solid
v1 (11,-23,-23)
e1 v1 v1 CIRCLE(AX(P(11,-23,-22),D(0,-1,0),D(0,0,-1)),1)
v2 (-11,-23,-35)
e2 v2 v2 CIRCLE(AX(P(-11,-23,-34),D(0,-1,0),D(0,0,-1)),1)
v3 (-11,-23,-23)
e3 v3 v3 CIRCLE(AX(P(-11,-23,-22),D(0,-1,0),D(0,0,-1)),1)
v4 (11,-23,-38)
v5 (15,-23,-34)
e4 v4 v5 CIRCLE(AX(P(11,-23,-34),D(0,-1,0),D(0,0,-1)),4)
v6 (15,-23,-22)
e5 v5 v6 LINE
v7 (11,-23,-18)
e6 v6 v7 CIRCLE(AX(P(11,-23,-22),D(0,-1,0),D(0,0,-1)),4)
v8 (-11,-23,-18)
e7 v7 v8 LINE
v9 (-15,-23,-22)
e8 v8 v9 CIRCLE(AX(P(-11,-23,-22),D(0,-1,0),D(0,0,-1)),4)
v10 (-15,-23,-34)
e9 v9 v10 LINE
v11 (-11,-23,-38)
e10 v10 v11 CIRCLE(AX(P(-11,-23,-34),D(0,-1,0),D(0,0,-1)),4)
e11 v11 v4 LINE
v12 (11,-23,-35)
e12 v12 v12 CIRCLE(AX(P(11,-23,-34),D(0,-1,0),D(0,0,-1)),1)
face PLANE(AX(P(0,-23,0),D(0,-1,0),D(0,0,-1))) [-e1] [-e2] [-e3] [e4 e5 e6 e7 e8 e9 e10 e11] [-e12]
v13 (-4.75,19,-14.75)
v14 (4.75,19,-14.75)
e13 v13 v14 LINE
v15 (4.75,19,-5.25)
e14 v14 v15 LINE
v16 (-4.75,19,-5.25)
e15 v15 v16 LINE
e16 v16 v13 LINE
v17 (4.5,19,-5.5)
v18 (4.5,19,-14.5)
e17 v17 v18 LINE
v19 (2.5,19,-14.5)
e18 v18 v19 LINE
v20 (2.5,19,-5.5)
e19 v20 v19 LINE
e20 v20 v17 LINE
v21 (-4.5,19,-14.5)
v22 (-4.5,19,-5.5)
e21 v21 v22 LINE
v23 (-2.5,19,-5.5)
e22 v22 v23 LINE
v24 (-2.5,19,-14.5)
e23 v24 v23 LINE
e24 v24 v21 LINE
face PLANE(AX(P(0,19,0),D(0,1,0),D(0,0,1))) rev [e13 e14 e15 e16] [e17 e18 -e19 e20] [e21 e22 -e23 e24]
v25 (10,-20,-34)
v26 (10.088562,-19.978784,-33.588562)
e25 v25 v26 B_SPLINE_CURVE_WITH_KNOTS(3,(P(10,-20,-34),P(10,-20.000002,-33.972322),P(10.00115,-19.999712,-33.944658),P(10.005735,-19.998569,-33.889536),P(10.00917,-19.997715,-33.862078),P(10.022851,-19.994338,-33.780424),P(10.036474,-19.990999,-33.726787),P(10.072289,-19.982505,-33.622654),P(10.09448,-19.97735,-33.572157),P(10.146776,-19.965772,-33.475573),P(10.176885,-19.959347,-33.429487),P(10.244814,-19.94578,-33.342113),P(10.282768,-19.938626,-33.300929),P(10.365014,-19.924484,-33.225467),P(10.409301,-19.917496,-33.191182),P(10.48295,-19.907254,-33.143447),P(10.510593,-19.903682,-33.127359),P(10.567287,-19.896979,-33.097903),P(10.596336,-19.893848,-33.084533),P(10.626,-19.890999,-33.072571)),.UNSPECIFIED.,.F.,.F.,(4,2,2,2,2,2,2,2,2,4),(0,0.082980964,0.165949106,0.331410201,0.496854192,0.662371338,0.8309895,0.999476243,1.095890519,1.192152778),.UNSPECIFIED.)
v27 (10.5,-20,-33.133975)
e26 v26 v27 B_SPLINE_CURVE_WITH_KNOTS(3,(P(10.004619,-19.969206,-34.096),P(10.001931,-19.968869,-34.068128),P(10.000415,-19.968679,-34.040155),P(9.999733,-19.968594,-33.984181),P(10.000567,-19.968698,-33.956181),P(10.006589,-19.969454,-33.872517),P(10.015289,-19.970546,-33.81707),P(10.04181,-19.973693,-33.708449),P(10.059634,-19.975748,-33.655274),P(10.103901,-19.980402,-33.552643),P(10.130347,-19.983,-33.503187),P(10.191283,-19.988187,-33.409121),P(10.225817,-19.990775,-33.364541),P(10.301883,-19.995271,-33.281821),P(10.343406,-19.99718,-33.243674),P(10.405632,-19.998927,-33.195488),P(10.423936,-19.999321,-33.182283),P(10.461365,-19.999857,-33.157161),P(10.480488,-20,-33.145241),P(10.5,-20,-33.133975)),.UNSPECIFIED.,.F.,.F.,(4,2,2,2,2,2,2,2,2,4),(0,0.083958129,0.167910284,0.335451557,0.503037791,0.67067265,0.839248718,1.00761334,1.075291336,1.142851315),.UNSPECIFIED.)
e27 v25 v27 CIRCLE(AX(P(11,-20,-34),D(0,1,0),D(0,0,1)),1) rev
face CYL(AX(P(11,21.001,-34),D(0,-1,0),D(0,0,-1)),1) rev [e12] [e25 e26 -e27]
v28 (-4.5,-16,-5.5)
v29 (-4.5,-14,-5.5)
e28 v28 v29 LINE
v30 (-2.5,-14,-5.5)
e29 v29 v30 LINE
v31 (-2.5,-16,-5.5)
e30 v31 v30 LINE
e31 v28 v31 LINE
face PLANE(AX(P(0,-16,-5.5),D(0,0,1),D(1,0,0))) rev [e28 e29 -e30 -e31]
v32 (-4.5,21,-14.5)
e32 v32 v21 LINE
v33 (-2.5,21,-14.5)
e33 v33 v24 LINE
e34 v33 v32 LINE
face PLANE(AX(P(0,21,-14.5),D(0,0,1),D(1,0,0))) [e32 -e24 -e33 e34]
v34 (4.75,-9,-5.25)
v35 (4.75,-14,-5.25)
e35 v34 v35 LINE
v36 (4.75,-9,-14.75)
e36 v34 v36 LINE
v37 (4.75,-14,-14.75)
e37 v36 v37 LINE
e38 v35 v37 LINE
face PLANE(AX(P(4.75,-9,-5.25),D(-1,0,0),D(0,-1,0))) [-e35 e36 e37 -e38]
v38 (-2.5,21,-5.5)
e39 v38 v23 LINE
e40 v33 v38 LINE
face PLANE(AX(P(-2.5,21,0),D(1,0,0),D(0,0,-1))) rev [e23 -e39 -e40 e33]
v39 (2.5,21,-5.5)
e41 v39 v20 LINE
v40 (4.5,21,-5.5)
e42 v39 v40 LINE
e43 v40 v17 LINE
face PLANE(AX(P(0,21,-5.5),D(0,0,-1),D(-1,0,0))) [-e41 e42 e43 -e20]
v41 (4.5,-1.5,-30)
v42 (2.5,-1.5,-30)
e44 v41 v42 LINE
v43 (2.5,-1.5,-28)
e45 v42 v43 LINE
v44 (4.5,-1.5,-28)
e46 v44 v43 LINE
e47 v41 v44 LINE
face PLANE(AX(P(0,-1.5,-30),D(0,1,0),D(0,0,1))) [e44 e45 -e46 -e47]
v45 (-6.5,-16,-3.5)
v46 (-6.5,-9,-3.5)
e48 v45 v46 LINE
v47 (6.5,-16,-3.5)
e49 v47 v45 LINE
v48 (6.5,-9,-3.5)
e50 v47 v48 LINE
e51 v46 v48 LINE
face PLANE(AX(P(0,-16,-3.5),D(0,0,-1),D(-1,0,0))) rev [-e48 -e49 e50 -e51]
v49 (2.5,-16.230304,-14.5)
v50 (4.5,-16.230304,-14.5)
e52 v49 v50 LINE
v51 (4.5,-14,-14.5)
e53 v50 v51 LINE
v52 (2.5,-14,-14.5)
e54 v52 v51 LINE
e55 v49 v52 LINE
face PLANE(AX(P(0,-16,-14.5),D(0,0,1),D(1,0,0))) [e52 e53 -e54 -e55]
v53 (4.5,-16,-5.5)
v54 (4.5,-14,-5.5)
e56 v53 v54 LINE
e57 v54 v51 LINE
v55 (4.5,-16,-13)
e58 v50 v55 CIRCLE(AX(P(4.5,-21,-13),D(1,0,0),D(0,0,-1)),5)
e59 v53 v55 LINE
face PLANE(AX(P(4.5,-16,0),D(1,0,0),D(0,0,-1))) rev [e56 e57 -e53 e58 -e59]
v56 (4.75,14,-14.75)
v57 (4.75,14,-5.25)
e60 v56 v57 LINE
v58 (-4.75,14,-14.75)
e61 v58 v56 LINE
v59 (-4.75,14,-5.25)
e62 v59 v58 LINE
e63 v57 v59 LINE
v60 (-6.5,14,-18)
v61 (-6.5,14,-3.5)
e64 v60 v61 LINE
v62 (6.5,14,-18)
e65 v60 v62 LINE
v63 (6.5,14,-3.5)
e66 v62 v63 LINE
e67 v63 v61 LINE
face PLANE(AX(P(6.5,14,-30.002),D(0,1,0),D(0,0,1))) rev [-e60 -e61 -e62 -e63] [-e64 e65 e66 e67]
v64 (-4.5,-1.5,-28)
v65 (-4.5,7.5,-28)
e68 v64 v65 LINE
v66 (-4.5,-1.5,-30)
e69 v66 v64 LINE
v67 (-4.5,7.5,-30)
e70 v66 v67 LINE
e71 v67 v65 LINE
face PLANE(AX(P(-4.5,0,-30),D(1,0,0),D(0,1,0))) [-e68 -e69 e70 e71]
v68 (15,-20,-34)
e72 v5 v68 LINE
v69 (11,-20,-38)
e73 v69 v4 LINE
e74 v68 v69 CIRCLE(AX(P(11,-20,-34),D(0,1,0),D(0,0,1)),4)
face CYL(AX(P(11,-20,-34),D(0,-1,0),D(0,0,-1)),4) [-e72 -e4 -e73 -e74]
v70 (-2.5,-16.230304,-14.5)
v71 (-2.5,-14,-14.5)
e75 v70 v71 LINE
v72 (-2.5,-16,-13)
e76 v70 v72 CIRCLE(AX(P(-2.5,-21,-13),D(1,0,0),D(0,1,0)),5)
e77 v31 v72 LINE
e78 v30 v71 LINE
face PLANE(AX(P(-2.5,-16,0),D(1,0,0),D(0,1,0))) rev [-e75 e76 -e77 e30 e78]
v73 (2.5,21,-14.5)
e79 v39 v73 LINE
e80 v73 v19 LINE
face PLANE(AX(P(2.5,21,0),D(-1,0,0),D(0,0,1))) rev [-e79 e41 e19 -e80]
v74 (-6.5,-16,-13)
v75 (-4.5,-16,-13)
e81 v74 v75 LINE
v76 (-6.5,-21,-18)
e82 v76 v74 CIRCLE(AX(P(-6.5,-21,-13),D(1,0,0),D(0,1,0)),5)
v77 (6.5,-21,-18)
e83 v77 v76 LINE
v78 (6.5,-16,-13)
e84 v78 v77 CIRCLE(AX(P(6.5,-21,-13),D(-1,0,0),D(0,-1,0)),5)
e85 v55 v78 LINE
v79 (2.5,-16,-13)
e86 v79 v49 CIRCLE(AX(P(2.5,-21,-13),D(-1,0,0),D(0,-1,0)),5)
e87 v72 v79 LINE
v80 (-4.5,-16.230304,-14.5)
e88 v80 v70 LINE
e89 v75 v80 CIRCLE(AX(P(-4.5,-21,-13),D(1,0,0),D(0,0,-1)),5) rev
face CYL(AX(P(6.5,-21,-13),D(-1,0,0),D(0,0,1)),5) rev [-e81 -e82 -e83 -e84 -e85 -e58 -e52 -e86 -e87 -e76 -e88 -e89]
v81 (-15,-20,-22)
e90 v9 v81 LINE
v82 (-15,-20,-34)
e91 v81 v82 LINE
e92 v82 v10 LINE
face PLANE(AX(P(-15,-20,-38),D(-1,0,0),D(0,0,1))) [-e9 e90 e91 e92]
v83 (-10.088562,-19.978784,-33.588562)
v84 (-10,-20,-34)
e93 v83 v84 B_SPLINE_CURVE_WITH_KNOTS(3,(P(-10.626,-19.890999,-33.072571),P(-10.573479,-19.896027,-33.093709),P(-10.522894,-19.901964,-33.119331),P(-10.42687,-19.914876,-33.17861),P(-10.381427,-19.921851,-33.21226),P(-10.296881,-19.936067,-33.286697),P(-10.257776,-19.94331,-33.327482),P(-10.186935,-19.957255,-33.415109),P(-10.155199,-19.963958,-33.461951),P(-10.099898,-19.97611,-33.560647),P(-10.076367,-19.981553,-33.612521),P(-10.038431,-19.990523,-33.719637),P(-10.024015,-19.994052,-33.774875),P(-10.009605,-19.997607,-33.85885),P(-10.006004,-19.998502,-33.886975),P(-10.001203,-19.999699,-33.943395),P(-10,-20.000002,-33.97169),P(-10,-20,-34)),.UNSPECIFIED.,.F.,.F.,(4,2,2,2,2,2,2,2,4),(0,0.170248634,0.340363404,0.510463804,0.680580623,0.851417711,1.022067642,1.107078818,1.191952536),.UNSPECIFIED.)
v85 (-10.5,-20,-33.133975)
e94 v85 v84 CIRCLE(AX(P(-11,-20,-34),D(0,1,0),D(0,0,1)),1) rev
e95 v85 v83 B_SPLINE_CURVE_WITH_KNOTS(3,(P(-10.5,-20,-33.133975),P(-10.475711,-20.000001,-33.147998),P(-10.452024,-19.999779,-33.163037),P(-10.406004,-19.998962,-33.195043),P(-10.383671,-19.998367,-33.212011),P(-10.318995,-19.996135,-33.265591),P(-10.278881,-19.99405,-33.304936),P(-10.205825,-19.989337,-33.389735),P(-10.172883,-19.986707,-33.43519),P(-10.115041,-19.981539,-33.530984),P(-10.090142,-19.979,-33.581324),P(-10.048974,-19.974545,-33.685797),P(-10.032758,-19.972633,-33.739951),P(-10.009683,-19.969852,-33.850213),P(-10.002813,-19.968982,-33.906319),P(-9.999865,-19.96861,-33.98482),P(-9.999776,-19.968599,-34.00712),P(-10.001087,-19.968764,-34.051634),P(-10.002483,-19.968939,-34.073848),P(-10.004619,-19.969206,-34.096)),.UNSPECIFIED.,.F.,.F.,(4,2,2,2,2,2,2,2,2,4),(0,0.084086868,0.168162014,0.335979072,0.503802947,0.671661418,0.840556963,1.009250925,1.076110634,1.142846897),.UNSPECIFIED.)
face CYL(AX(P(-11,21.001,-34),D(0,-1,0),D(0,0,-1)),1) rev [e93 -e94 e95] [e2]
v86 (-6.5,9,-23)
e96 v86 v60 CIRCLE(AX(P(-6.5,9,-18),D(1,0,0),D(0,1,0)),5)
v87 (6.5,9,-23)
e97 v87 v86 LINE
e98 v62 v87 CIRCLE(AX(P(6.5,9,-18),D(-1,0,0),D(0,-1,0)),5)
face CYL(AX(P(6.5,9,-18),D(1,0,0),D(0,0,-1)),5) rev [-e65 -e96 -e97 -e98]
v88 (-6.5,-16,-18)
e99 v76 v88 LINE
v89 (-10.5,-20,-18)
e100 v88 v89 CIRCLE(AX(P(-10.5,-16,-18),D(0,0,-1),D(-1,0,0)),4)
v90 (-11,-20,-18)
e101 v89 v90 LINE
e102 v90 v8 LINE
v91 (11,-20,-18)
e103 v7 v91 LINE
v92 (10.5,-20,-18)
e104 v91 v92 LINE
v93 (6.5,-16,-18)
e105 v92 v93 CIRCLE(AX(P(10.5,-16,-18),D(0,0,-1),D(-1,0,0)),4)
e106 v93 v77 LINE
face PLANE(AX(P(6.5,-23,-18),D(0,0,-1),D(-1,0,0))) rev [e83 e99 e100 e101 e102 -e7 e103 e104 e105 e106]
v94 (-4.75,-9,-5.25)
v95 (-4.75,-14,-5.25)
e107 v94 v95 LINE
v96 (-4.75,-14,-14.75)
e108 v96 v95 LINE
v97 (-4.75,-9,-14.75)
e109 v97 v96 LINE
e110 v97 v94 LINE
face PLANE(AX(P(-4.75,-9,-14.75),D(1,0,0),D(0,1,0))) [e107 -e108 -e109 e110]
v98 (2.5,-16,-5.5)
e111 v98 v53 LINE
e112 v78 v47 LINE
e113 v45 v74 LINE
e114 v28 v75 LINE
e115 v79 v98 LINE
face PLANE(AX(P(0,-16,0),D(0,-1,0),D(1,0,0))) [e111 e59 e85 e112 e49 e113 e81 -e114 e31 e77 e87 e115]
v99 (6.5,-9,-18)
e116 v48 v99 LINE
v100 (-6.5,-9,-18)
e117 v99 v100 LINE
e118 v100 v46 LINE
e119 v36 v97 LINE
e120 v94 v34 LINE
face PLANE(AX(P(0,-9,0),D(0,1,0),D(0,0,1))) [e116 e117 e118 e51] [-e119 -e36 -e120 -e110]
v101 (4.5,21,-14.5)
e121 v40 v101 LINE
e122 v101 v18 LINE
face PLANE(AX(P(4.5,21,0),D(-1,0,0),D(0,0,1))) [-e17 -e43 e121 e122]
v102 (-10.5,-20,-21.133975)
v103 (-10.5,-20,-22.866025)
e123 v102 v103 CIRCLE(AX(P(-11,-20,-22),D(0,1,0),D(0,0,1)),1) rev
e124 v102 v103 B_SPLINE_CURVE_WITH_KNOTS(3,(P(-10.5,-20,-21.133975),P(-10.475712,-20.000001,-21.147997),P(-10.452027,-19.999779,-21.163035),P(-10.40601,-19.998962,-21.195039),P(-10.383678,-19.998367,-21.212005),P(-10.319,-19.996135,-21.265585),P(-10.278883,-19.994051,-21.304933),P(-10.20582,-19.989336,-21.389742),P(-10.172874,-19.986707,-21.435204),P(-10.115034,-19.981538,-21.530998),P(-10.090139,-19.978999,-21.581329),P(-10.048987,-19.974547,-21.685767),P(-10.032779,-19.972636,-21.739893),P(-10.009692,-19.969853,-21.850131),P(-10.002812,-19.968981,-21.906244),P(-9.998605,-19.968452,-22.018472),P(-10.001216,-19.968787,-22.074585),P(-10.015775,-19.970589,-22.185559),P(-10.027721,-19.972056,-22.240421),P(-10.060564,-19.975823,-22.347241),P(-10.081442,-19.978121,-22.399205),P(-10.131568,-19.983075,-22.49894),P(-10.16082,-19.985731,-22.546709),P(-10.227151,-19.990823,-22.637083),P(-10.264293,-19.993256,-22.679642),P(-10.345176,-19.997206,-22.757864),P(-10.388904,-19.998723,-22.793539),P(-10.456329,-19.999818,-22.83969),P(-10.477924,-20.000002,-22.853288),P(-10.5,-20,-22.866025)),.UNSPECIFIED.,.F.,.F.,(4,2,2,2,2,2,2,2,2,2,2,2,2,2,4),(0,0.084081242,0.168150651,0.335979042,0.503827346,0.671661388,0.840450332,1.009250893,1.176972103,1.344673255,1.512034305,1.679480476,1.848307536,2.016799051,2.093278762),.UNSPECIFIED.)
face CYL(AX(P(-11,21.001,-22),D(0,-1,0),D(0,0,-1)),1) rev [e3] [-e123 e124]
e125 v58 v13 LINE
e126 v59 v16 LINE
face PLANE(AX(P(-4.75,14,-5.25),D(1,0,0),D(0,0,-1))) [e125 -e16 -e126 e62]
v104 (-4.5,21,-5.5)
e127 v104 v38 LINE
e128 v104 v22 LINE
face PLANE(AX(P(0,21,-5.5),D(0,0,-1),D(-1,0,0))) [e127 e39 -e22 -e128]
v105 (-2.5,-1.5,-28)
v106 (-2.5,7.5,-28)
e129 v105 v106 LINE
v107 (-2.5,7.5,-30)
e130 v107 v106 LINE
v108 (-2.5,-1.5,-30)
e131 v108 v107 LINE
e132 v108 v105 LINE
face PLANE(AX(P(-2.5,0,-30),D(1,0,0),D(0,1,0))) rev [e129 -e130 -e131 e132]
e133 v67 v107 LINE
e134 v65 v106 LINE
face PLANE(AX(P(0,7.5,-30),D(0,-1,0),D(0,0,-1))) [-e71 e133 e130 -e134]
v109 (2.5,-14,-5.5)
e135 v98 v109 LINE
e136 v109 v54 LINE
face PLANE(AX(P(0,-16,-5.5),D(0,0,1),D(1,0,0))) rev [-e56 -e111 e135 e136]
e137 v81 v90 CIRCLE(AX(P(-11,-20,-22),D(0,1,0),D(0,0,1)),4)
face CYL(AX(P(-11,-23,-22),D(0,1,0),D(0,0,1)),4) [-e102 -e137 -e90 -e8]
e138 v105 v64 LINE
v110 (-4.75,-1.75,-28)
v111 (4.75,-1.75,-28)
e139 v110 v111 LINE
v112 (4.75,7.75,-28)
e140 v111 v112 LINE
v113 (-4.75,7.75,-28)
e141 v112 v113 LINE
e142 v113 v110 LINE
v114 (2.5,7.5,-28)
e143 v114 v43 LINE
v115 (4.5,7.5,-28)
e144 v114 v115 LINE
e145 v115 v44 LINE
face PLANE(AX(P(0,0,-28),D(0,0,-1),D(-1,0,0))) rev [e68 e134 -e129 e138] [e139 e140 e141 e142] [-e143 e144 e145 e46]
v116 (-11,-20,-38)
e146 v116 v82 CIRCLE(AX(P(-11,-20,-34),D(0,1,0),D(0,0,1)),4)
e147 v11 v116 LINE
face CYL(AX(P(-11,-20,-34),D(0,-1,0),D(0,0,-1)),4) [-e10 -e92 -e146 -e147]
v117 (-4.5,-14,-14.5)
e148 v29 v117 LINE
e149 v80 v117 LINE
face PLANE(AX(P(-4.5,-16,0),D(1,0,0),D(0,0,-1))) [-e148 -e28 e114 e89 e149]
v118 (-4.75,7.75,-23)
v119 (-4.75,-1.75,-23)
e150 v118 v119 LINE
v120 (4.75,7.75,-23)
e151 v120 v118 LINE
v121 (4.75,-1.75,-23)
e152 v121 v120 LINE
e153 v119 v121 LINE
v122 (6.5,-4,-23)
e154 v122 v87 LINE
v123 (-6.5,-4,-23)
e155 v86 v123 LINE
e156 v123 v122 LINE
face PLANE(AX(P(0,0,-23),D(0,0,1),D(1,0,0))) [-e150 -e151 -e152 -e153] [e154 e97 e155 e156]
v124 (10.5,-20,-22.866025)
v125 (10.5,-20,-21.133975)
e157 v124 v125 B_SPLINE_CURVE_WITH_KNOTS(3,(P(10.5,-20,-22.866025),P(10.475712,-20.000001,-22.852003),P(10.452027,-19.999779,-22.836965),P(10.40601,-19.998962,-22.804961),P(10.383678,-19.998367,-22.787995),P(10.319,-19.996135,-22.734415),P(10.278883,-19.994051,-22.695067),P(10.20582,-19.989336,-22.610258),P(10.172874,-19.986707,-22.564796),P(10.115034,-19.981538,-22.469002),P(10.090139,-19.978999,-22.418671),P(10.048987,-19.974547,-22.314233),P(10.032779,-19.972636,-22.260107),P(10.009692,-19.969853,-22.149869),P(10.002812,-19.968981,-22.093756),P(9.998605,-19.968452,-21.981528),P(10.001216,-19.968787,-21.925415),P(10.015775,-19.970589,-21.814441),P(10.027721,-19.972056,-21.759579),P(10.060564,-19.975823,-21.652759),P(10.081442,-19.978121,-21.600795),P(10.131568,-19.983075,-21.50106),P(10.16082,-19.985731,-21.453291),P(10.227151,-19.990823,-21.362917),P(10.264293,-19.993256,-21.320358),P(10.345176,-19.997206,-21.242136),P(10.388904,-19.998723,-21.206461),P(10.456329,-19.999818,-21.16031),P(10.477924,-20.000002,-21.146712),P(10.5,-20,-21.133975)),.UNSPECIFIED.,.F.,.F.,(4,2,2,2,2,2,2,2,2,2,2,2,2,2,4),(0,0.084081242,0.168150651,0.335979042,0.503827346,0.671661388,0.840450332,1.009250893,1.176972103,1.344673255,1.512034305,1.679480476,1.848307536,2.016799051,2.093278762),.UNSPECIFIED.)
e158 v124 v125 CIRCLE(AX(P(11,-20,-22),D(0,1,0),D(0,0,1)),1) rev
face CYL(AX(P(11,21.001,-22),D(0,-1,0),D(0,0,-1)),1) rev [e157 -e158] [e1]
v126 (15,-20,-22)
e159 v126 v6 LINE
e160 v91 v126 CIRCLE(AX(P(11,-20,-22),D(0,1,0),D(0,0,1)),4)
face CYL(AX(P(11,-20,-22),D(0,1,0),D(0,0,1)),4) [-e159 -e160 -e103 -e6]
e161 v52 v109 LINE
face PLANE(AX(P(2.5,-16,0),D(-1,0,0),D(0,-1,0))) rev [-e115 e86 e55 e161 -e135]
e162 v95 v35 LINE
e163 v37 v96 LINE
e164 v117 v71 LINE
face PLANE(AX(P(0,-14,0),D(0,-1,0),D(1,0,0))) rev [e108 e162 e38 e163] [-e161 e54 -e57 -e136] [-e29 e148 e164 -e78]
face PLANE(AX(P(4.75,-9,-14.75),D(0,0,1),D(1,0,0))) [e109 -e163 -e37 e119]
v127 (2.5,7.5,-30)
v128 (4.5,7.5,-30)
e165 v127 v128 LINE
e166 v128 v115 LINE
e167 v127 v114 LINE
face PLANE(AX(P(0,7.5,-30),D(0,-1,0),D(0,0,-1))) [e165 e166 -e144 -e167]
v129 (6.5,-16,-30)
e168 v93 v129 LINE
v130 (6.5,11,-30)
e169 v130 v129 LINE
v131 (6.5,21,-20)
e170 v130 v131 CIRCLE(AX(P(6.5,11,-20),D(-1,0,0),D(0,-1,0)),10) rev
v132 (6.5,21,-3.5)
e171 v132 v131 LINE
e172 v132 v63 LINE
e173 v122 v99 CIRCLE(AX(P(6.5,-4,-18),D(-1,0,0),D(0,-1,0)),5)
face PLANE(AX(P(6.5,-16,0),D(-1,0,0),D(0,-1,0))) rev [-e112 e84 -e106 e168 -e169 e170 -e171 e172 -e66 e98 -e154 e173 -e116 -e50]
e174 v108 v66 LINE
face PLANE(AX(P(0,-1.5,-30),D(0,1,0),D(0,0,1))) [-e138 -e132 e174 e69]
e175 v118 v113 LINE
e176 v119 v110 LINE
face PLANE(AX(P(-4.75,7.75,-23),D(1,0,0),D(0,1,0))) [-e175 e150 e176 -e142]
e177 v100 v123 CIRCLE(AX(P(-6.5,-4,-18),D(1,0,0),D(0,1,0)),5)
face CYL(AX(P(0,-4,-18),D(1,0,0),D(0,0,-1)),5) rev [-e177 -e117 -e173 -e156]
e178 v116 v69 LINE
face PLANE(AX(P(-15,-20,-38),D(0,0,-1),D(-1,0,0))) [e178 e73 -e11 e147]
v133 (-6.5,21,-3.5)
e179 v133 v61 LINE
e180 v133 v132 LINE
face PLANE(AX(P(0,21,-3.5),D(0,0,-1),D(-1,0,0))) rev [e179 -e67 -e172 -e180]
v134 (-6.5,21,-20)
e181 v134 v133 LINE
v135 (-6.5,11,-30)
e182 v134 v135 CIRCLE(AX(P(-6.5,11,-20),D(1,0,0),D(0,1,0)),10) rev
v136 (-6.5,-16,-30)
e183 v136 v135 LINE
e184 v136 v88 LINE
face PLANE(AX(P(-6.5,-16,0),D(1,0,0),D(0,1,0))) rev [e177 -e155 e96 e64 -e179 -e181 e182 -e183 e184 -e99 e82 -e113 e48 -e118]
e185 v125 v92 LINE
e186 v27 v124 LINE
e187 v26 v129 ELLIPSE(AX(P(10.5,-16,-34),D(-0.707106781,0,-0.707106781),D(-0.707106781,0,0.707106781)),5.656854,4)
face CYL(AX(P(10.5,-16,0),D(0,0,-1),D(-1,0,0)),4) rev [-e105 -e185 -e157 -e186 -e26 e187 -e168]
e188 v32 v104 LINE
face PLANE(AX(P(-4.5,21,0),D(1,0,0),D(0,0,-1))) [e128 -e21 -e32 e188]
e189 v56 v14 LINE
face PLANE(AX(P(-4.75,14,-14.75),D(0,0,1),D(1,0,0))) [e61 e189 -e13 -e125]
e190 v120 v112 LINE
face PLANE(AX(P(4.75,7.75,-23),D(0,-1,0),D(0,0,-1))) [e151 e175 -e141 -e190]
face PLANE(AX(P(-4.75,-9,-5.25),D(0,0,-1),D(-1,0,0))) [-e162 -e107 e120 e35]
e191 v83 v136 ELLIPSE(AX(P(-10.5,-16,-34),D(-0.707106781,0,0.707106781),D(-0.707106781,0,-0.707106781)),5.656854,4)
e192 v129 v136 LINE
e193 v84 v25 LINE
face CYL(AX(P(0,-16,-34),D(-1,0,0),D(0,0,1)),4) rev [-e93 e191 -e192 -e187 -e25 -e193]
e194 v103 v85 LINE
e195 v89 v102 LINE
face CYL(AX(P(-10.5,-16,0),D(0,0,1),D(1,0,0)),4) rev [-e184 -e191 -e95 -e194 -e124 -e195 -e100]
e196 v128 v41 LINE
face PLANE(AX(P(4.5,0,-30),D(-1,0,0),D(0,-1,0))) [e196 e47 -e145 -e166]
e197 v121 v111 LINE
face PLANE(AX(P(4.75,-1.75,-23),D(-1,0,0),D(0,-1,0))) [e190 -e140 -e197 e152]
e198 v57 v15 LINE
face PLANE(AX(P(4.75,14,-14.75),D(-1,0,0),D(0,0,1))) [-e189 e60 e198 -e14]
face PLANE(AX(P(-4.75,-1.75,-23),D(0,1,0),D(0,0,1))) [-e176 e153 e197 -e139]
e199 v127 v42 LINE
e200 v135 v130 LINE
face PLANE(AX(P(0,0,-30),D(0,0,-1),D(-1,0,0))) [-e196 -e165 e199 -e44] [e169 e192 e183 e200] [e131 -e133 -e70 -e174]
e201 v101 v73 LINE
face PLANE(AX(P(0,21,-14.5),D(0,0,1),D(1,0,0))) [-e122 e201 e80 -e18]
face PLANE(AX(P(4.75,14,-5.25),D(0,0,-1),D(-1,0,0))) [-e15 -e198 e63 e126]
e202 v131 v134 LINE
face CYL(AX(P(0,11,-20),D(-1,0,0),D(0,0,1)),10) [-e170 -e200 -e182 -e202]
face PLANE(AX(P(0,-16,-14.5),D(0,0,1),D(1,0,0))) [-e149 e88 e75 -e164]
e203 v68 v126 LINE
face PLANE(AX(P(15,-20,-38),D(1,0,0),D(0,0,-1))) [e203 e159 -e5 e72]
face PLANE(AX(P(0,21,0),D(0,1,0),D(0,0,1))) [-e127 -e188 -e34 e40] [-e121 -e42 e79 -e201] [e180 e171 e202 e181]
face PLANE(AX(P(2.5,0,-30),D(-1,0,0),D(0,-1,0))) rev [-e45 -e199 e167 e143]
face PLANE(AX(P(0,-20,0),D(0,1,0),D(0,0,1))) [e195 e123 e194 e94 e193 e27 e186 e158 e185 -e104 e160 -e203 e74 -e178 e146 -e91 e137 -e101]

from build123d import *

# Parameters (mm, degrees)
SKETCH1_W            = 13
SKETCH1_H            = 13
SKETCH1_W_2          = 5
SKETCH1_H_2          = 9
BOSS_EXTRUDE1_DEPTH  = 2
SKETCH2_W            = 13
SKETCH2_H            = 13
SKETCH2_W_2          = 9.5
SKETCH2_H_2          = 9.5
BOSS_EXTRUDE2_DEPTH  = 5
SKETCH3_W            = 13
SKETCH3_H            = 13
SKETCH3_W_2          = 5
SKETCH3_H_2          = 9
BOSS_EXTRUDE3_DEPTH  = 2
SKETCH4_W            = 13
SKETCH4_H            = 13
SKETCH4_W_2          = 9.5
SKETCH4_H_2          = 9.5
BOSS_EXTRUDE4_DEPTH  = 5
SKETCH5_W            = 13
SKETCH5_H            = 13
SKETCH5_W_2          = 5
SKETCH5_H_2          = 9
BOSS_EXTRUDE5_DEPTH  = 2
SKETCH6_W            = 13
SKETCH6_H            = 13
SKETCH6_W_2          = 9.5
SKETCH6_H_2          = 9.5
BOSS_EXTRUDE6_DEPTH  = 5
SKETCH7_W            = 13
SKETCH7_H            = 7
BOSS_EXTRUDE7_DEPTH  = 12.5
SKETCH8_W            = 13
SKETCH8_H            = 7
BOSS_EXTRUDE8_DEPTH  = 11.5
BOSS_EXTRUDE9_REACH  = 27.797
SKETCH9_W            = 13
SKETCH9_H            = 7
SKETCH10_W           = 13
SKETCH10_H           = 12
BOSS_EXTRUDE10_DEPTH = 7
SKETCH11_W           = 30
SKETCH11_H           = 20
BOSS_EXTRUDE11_DEPTH = 3
FILLET1_R            = 4
CUT_EXTRUDE1_REACH   = 62.042
SKETCH12_R           = 1
FILLET2_R            = 10
FILLET3_R            = 5


with BuildPart() as part:
    # Sketch1 → Boss-Extrude1 (new body)
    # profile 1 of 2: a face of its own
    with BuildSketch(Plane.XZ.offset(14)):
        with Locations((0, -10)):
            Rectangle(SKETCH1_W, SKETCH1_H)
        Polygon((-4.5, -14.5), (-2.5, -14.5), (2.5, -14.5), (4.5, -14.5), (4.5, -5.5), (2.5, -5.5), (-2.5, -5.5), (-4.5, -5.5), align=None, mode=Mode.SUBTRACT)
    # profile 2 of 2: a face of its own
    with BuildSketch(Plane.XZ.offset(14)):
        with Locations((0, -10)):
            Rectangle(SKETCH1_W_2, SKETCH1_H_2)
    extrude(amount=BOSS_EXTRUDE1_DEPTH)

    # Sketch2 → Boss-Extrude2 (add)
    with BuildSketch(Plane(origin=(0, -14, 0), x_dir=(1, 0, 0), z_dir=(0, 1, 0))):
        with Locations((0, 10)):
            Rectangle(SKETCH2_W, SKETCH2_H)
        with Locations((0, 10)):
            Rectangle(SKETCH2_W_2, SKETCH2_H_2, mode=Mode.SUBTRACT)
    extrude(amount=BOSS_EXTRUDE2_DEPTH)


with BuildPart() as body_2:
    # Sketch3 → Boss-Extrude3 (new body)
    # profile 1 of 2: a face of its own
    with BuildSketch(Plane(origin=(0, 0, -28), x_dir=(-1, 0, 0), z_dir=(0, 0, -1))):
        with Locations((0, 3)):
            Rectangle(SKETCH3_W, SKETCH3_H)
        Polygon((4.5, -1.5), (2.5, -1.5), (-2.5, -1.5), (-4.5, -1.5), (-4.5, 7.5), (-2.5, 7.5), (2.5, 7.5), (4.5, 7.5), align=None, mode=Mode.SUBTRACT)
    # profile 2 of 2: a face of its own
    with BuildSketch(Plane(origin=(0, 0, -28), x_dir=(-1, 0, 0), z_dir=(0, 0, -1))):
        with Locations((0, 3)):
            Rectangle(SKETCH3_W_2, SKETCH3_H_2)
    extrude(amount=BOSS_EXTRUDE3_DEPTH)

    # Sketch4 → Boss-Extrude4 (add)
    with BuildSketch(Plane.XY.offset(-28)):
        with Locations((0, 3)):
            Rectangle(SKETCH4_W, SKETCH4_H)
        with Locations((0, 3)):
            Rectangle(SKETCH4_W_2, SKETCH4_H_2, mode=Mode.SUBTRACT)
    extrude(amount=BOSS_EXTRUDE4_DEPTH)

    # Sketch7 → Boss-Extrude7 (add)
    with BuildSketch(Plane.XZ.offset(3.5)):
        with Locations((0, -26.5)):
            Rectangle(SKETCH7_W, SKETCH7_H)
    extrude(amount=BOSS_EXTRUDE7_DEPTH)

    # Sketch8 → Boss-Extrude8 (add)
    with BuildSketch(Plane(origin=(0, 9.5, 0), x_dir=(1, 0, 0), z_dir=(0, 1, 0))):
        with Locations((0, 26.5)):
            Rectangle(SKETCH8_W, SKETCH8_H)
    extrude(amount=BOSS_EXTRUDE8_DEPTH)

    # Sketch9 → Boss-Extrude9 (add, up to next)
    with BuildSketch(Plane(origin=(0, 0, -16.5), x_dir=(-1, 0, 0), z_dir=(0, 0, -1)), mode=Mode.PRIVATE) as boss_extrude9_sk1:
        with Locations((0, -12.5)):
            Rectangle(SKETCH9_W, SKETCH9_H)
    boss_extrude9_tool1 = extrude(boss_extrude9_sk1.sketch, amount=BOSS_EXTRUDE9_REACH, mode=Mode.PRIVATE) - body_2.part
    # Sketch9 → Boss-Extrude9 (add, up to next)
    with BuildSketch(Plane(origin=(0, 0, -16.5), x_dir=(-1, 0, 0), z_dir=(0, 0, -1)), mode=Mode.PRIVATE) as boss_extrude9_sk2:
        with Locations((0, 17.5)):
            Rectangle(SKETCH9_W, SKETCH9_H)
    boss_extrude9_tool2 = extrude(boss_extrude9_sk2.sketch, amount=BOSS_EXTRUDE9_REACH, mode=Mode.PRIVATE) - body_2.part

    add(part.part)  # Boss-Extrude9 merges part


with BuildPart() as body_3:
    # Sketch5 → Boss-Extrude5 (new body)
    # profile 1 of 2: a face of its own
    with BuildSketch(Plane(origin=(0, 19, 0), x_dir=(1, 0, 0), z_dir=(0, 1, 0))):
        with Locations((0, 10)):
            Rectangle(SKETCH5_W, SKETCH5_H)
        Polygon((-4.5, 14.5), (-2.5, 14.5), (2.5, 14.5), (4.5, 14.5), (4.5, 5.5), (2.5, 5.5), (-2.5, 5.5), (-4.5, 5.5), align=None, mode=Mode.SUBTRACT)
    # profile 2 of 2: a face of its own
    with BuildSketch(Plane(origin=(0, 19, 0), x_dir=(1, 0, 0), z_dir=(0, 1, 0))):
        with Locations((0, 10)):
            Rectangle(SKETCH5_W_2, SKETCH5_H_2)
    extrude(amount=BOSS_EXTRUDE5_DEPTH)

    # Sketch6 → Boss-Extrude6 (add)
    with BuildSketch(Plane.XZ.offset(-19)):
        with Locations((0, -10)):
            Rectangle(SKETCH6_W, SKETCH6_H)
        with Locations((0, -10)):
            Rectangle(SKETCH6_W_2, SKETCH6_H_2, mode=Mode.SUBTRACT)
    extrude(amount=BOSS_EXTRUDE6_DEPTH)


with BuildPart() as body_2_1:
    add(body_2.part)

    add(body_3.part)  # Boss-Extrude9 merges body 3
    add(boss_extrude9_tool1.solids().sort_by_distance((0, -12.5, -16.5))[0])
    add(boss_extrude9_tool2.solids().sort_by_distance((0, 17.5, -16.5))[0])

    # Sketch10 → Boss-Extrude10 (add)
    with BuildSketch(Plane.XZ.offset(16)):
        with Locations((0, -24)):
            Rectangle(SKETCH10_W, SKETCH10_H)
    extrude(amount=BOSS_EXTRUDE10_DEPTH)

    # Sketch11 → Boss-Extrude11 (add)
    with BuildSketch(Plane.XZ.offset(23)):
        with Locations((0, -28)):
            Rectangle(SKETCH11_W, SKETCH11_H)
    extrude(amount=-BOSS_EXTRUDE11_DEPTH)

    # Fillet1
    fillet1_edges = [body_2_1.edges().sort_by_distance(p)[0] for p in [
        (6.5, -20, -24),
        (-6.5, -20, -24),
        (0, -20, -30),
        (-15, -21.5, -18),
        (-15, -21.5, -38),
        (15, -21.5, -18),
        (15, -21.5, -38),
    ]]
    fillet(fillet1_edges, radius=FILLET1_R)

    # Sketch12 → Cut-Extrude1 (cut, up to next)
    with BuildSketch(Plane.XZ.offset(23), mode=Mode.PRIVATE) as cut_extrude1_sk1:
        with Locations(Location((-11, -22, 0), (0, 0, 270))):
            Circle(SKETCH12_R)
    cut_extrude1_tool1 = extrude(cut_extrude1_sk1.sketch, amount=-CUT_EXTRUDE1_REACH, mode=Mode.PRIVATE) & body_2_1.part
    # Sketch12 → Cut-Extrude1 (cut, up to next)
    with BuildSketch(Plane.XZ.offset(23), mode=Mode.PRIVATE) as cut_extrude1_sk2:
        with Locations(Location((11, -22, 0), (0, 0, 270))):
            Circle(SKETCH12_R)
    cut_extrude1_tool2 = extrude(cut_extrude1_sk2.sketch, amount=-CUT_EXTRUDE1_REACH, mode=Mode.PRIVATE) & body_2_1.part
    # Sketch12 → Cut-Extrude1 (cut, up to next)
    with BuildSketch(Plane.XZ.offset(23), mode=Mode.PRIVATE) as cut_extrude1_sk3:
        with Locations(Location((11, -34, 0), (0, 0, 270))):
            Circle(SKETCH12_R)
    cut_extrude1_tool3 = extrude(cut_extrude1_sk3.sketch, amount=-CUT_EXTRUDE1_REACH, mode=Mode.PRIVATE) & body_2_1.part
    # Sketch12 → Cut-Extrude1 (cut, up to next)
    with BuildSketch(Plane.XZ.offset(23), mode=Mode.PRIVATE) as cut_extrude1_sk4:
        with Locations(Location((-11, -34, 0), (0, 0, 270))):
            Circle(SKETCH12_R)
    cut_extrude1_tool4 = extrude(cut_extrude1_sk4.sketch, amount=-CUT_EXTRUDE1_REACH, mode=Mode.PRIVATE) & body_2_1.part
    add(cut_extrude1_tool1.solids().sort_by_distance((-11, -23, -22))[0], mode=Mode.SUBTRACT)
    add(cut_extrude1_tool2.solids().sort_by_distance((11, -23, -22))[0], mode=Mode.SUBTRACT)
    add(cut_extrude1_tool3.solids().sort_by_distance((11, -23, -34))[0], mode=Mode.SUBTRACT)
    add(cut_extrude1_tool4.solids().sort_by_distance((-11, -23, -34))[0], mode=Mode.SUBTRACT)

    # Fillet2
    fillet2_edges = [body_2_1.edges().sort_by_distance(p)[0] for p in [
        (0, 21, -30),
    ]]
    fillet(fillet2_edges, radius=FILLET2_R)

    # Fillet3
    # the kernel refuses this fillet: 5 mm, written as the material it adds along each edge
    with BuildSketch(Plane(origin=(-6.5, 14, -23), x_dir=(0, 0, 1), z_dir=(1, 0, 0)), Plane(origin=(6.5, -9, -23), x_dir=(0, 0, 1), z_dir=(-1, 0, 0))) as fillet3_piece_1:
        with BuildLine():
            CenterArc((FILLET3_R, FILLET3_R), FILLET3_R, 180, 90)
            Line((0, FILLET3_R), (0, 0))
            Line((0, 0), (FILLET3_R, 0))
        make_face()
    extrude(amount=13)
    with BuildSketch(Plane(origin=(-6.5, -16, -18), x_dir=(0, 0, 1), z_dir=(1, 0, 0))) as fillet3_piece_2_section:
        with BuildLine():
            CenterArc((FILLET3_R, FILLET3_R), FILLET3_R, 180, 90)
            Line((0, FILLET3_R), (0, 0))
            Line((0, 0), (FILLET3_R, 0))
        make_face()
    fillet3_piece_2 = extrude(amount=13, mode=Mode.PRIVATE)
    fillet3_piece_2 = split(fillet3_piece_2, bisect_by=Plane(origin=(-5.5, -20.249492121, -14.5), z_dir=(0, 0, -1)), keep=Keep.TOP, mode=Mode.PRIVATE)
    add(fillet3_piece_2)
    with BuildSketch(Plane(origin=(-6.5, -16, -18), x_dir=(0, 0, 1), z_dir=(1, 0, 0))) as fillet3_piece_3_section:
        with BuildLine():
            CenterArc((FILLET3_R, FILLET3_R), FILLET3_R, 180, 90)
            Line((0, FILLET3_R), (0, 0))
            Line((0, 0), (FILLET3_R, 0))
        make_face()
    fillet3_piece_3 = extrude(amount=25.5, mode=Mode.PRIVATE)
    fillet3_piece_3 = split(fillet3_piece_3, bisect_by=Plane(origin=(-4.5, -16.06880959, -14.126748988), z_dir=(-1, 0, 0)), keep=Keep.TOP, mode=Mode.PRIVATE)
    add(fillet3_piece_3)
    with BuildSketch(Plane(origin=(-19, -16, -18), x_dir=(0, 0, 1), z_dir=(1, 0, 0))) as fillet3_piece_4_section:
        with BuildLine():
            CenterArc((FILLET3_R, FILLET3_R), FILLET3_R, 180, 90)
            Line((0, FILLET3_R), (0, 0))
            Line((0, 0), (FILLET3_R, 0))
        make_face()
    fillet3_piece_4 = extrude(amount=38, mode=Mode.PRIVATE)
    fillet3_piece_4 = split(fillet3_piece_4, bisect_by=Plane(origin=(-2.5, -16.06880959, -14.126748988), z_dir=(1, 0, 0)), keep=Keep.TOP, mode=Mode.PRIVATE)
    fillet3_piece_4 = split(fillet3_piece_4, bisect_by=Plane(origin=(2.5, -16.06880959, -14.126748988), z_dir=(-1, 0, 0)), keep=Keep.TOP, mode=Mode.PRIVATE)
    add(fillet3_piece_4)
    with BuildSketch(Plane(origin=(-19, -16, -18), x_dir=(0, 0, 1), z_dir=(1, 0, 0))) as fillet3_piece_5_section:
        with BuildLine():
            CenterArc((FILLET3_R, FILLET3_R), FILLET3_R, 180, 90)
            Line((0, FILLET3_R), (0, 0))
            Line((0, 0), (FILLET3_R, 0))
        make_face()
    fillet3_piece_5 = extrude(amount=25.5, mode=Mode.PRIVATE)
    fillet3_piece_5 = split(fillet3_piece_5, bisect_by=Plane(origin=(4.5, -16.06880959, -14.12674899), z_dir=(1, 0, 0)), keep=Keep.TOP, mode=Mode.PRIVATE)
    add(fillet3_piece_5)


solid = body_2_1.part
